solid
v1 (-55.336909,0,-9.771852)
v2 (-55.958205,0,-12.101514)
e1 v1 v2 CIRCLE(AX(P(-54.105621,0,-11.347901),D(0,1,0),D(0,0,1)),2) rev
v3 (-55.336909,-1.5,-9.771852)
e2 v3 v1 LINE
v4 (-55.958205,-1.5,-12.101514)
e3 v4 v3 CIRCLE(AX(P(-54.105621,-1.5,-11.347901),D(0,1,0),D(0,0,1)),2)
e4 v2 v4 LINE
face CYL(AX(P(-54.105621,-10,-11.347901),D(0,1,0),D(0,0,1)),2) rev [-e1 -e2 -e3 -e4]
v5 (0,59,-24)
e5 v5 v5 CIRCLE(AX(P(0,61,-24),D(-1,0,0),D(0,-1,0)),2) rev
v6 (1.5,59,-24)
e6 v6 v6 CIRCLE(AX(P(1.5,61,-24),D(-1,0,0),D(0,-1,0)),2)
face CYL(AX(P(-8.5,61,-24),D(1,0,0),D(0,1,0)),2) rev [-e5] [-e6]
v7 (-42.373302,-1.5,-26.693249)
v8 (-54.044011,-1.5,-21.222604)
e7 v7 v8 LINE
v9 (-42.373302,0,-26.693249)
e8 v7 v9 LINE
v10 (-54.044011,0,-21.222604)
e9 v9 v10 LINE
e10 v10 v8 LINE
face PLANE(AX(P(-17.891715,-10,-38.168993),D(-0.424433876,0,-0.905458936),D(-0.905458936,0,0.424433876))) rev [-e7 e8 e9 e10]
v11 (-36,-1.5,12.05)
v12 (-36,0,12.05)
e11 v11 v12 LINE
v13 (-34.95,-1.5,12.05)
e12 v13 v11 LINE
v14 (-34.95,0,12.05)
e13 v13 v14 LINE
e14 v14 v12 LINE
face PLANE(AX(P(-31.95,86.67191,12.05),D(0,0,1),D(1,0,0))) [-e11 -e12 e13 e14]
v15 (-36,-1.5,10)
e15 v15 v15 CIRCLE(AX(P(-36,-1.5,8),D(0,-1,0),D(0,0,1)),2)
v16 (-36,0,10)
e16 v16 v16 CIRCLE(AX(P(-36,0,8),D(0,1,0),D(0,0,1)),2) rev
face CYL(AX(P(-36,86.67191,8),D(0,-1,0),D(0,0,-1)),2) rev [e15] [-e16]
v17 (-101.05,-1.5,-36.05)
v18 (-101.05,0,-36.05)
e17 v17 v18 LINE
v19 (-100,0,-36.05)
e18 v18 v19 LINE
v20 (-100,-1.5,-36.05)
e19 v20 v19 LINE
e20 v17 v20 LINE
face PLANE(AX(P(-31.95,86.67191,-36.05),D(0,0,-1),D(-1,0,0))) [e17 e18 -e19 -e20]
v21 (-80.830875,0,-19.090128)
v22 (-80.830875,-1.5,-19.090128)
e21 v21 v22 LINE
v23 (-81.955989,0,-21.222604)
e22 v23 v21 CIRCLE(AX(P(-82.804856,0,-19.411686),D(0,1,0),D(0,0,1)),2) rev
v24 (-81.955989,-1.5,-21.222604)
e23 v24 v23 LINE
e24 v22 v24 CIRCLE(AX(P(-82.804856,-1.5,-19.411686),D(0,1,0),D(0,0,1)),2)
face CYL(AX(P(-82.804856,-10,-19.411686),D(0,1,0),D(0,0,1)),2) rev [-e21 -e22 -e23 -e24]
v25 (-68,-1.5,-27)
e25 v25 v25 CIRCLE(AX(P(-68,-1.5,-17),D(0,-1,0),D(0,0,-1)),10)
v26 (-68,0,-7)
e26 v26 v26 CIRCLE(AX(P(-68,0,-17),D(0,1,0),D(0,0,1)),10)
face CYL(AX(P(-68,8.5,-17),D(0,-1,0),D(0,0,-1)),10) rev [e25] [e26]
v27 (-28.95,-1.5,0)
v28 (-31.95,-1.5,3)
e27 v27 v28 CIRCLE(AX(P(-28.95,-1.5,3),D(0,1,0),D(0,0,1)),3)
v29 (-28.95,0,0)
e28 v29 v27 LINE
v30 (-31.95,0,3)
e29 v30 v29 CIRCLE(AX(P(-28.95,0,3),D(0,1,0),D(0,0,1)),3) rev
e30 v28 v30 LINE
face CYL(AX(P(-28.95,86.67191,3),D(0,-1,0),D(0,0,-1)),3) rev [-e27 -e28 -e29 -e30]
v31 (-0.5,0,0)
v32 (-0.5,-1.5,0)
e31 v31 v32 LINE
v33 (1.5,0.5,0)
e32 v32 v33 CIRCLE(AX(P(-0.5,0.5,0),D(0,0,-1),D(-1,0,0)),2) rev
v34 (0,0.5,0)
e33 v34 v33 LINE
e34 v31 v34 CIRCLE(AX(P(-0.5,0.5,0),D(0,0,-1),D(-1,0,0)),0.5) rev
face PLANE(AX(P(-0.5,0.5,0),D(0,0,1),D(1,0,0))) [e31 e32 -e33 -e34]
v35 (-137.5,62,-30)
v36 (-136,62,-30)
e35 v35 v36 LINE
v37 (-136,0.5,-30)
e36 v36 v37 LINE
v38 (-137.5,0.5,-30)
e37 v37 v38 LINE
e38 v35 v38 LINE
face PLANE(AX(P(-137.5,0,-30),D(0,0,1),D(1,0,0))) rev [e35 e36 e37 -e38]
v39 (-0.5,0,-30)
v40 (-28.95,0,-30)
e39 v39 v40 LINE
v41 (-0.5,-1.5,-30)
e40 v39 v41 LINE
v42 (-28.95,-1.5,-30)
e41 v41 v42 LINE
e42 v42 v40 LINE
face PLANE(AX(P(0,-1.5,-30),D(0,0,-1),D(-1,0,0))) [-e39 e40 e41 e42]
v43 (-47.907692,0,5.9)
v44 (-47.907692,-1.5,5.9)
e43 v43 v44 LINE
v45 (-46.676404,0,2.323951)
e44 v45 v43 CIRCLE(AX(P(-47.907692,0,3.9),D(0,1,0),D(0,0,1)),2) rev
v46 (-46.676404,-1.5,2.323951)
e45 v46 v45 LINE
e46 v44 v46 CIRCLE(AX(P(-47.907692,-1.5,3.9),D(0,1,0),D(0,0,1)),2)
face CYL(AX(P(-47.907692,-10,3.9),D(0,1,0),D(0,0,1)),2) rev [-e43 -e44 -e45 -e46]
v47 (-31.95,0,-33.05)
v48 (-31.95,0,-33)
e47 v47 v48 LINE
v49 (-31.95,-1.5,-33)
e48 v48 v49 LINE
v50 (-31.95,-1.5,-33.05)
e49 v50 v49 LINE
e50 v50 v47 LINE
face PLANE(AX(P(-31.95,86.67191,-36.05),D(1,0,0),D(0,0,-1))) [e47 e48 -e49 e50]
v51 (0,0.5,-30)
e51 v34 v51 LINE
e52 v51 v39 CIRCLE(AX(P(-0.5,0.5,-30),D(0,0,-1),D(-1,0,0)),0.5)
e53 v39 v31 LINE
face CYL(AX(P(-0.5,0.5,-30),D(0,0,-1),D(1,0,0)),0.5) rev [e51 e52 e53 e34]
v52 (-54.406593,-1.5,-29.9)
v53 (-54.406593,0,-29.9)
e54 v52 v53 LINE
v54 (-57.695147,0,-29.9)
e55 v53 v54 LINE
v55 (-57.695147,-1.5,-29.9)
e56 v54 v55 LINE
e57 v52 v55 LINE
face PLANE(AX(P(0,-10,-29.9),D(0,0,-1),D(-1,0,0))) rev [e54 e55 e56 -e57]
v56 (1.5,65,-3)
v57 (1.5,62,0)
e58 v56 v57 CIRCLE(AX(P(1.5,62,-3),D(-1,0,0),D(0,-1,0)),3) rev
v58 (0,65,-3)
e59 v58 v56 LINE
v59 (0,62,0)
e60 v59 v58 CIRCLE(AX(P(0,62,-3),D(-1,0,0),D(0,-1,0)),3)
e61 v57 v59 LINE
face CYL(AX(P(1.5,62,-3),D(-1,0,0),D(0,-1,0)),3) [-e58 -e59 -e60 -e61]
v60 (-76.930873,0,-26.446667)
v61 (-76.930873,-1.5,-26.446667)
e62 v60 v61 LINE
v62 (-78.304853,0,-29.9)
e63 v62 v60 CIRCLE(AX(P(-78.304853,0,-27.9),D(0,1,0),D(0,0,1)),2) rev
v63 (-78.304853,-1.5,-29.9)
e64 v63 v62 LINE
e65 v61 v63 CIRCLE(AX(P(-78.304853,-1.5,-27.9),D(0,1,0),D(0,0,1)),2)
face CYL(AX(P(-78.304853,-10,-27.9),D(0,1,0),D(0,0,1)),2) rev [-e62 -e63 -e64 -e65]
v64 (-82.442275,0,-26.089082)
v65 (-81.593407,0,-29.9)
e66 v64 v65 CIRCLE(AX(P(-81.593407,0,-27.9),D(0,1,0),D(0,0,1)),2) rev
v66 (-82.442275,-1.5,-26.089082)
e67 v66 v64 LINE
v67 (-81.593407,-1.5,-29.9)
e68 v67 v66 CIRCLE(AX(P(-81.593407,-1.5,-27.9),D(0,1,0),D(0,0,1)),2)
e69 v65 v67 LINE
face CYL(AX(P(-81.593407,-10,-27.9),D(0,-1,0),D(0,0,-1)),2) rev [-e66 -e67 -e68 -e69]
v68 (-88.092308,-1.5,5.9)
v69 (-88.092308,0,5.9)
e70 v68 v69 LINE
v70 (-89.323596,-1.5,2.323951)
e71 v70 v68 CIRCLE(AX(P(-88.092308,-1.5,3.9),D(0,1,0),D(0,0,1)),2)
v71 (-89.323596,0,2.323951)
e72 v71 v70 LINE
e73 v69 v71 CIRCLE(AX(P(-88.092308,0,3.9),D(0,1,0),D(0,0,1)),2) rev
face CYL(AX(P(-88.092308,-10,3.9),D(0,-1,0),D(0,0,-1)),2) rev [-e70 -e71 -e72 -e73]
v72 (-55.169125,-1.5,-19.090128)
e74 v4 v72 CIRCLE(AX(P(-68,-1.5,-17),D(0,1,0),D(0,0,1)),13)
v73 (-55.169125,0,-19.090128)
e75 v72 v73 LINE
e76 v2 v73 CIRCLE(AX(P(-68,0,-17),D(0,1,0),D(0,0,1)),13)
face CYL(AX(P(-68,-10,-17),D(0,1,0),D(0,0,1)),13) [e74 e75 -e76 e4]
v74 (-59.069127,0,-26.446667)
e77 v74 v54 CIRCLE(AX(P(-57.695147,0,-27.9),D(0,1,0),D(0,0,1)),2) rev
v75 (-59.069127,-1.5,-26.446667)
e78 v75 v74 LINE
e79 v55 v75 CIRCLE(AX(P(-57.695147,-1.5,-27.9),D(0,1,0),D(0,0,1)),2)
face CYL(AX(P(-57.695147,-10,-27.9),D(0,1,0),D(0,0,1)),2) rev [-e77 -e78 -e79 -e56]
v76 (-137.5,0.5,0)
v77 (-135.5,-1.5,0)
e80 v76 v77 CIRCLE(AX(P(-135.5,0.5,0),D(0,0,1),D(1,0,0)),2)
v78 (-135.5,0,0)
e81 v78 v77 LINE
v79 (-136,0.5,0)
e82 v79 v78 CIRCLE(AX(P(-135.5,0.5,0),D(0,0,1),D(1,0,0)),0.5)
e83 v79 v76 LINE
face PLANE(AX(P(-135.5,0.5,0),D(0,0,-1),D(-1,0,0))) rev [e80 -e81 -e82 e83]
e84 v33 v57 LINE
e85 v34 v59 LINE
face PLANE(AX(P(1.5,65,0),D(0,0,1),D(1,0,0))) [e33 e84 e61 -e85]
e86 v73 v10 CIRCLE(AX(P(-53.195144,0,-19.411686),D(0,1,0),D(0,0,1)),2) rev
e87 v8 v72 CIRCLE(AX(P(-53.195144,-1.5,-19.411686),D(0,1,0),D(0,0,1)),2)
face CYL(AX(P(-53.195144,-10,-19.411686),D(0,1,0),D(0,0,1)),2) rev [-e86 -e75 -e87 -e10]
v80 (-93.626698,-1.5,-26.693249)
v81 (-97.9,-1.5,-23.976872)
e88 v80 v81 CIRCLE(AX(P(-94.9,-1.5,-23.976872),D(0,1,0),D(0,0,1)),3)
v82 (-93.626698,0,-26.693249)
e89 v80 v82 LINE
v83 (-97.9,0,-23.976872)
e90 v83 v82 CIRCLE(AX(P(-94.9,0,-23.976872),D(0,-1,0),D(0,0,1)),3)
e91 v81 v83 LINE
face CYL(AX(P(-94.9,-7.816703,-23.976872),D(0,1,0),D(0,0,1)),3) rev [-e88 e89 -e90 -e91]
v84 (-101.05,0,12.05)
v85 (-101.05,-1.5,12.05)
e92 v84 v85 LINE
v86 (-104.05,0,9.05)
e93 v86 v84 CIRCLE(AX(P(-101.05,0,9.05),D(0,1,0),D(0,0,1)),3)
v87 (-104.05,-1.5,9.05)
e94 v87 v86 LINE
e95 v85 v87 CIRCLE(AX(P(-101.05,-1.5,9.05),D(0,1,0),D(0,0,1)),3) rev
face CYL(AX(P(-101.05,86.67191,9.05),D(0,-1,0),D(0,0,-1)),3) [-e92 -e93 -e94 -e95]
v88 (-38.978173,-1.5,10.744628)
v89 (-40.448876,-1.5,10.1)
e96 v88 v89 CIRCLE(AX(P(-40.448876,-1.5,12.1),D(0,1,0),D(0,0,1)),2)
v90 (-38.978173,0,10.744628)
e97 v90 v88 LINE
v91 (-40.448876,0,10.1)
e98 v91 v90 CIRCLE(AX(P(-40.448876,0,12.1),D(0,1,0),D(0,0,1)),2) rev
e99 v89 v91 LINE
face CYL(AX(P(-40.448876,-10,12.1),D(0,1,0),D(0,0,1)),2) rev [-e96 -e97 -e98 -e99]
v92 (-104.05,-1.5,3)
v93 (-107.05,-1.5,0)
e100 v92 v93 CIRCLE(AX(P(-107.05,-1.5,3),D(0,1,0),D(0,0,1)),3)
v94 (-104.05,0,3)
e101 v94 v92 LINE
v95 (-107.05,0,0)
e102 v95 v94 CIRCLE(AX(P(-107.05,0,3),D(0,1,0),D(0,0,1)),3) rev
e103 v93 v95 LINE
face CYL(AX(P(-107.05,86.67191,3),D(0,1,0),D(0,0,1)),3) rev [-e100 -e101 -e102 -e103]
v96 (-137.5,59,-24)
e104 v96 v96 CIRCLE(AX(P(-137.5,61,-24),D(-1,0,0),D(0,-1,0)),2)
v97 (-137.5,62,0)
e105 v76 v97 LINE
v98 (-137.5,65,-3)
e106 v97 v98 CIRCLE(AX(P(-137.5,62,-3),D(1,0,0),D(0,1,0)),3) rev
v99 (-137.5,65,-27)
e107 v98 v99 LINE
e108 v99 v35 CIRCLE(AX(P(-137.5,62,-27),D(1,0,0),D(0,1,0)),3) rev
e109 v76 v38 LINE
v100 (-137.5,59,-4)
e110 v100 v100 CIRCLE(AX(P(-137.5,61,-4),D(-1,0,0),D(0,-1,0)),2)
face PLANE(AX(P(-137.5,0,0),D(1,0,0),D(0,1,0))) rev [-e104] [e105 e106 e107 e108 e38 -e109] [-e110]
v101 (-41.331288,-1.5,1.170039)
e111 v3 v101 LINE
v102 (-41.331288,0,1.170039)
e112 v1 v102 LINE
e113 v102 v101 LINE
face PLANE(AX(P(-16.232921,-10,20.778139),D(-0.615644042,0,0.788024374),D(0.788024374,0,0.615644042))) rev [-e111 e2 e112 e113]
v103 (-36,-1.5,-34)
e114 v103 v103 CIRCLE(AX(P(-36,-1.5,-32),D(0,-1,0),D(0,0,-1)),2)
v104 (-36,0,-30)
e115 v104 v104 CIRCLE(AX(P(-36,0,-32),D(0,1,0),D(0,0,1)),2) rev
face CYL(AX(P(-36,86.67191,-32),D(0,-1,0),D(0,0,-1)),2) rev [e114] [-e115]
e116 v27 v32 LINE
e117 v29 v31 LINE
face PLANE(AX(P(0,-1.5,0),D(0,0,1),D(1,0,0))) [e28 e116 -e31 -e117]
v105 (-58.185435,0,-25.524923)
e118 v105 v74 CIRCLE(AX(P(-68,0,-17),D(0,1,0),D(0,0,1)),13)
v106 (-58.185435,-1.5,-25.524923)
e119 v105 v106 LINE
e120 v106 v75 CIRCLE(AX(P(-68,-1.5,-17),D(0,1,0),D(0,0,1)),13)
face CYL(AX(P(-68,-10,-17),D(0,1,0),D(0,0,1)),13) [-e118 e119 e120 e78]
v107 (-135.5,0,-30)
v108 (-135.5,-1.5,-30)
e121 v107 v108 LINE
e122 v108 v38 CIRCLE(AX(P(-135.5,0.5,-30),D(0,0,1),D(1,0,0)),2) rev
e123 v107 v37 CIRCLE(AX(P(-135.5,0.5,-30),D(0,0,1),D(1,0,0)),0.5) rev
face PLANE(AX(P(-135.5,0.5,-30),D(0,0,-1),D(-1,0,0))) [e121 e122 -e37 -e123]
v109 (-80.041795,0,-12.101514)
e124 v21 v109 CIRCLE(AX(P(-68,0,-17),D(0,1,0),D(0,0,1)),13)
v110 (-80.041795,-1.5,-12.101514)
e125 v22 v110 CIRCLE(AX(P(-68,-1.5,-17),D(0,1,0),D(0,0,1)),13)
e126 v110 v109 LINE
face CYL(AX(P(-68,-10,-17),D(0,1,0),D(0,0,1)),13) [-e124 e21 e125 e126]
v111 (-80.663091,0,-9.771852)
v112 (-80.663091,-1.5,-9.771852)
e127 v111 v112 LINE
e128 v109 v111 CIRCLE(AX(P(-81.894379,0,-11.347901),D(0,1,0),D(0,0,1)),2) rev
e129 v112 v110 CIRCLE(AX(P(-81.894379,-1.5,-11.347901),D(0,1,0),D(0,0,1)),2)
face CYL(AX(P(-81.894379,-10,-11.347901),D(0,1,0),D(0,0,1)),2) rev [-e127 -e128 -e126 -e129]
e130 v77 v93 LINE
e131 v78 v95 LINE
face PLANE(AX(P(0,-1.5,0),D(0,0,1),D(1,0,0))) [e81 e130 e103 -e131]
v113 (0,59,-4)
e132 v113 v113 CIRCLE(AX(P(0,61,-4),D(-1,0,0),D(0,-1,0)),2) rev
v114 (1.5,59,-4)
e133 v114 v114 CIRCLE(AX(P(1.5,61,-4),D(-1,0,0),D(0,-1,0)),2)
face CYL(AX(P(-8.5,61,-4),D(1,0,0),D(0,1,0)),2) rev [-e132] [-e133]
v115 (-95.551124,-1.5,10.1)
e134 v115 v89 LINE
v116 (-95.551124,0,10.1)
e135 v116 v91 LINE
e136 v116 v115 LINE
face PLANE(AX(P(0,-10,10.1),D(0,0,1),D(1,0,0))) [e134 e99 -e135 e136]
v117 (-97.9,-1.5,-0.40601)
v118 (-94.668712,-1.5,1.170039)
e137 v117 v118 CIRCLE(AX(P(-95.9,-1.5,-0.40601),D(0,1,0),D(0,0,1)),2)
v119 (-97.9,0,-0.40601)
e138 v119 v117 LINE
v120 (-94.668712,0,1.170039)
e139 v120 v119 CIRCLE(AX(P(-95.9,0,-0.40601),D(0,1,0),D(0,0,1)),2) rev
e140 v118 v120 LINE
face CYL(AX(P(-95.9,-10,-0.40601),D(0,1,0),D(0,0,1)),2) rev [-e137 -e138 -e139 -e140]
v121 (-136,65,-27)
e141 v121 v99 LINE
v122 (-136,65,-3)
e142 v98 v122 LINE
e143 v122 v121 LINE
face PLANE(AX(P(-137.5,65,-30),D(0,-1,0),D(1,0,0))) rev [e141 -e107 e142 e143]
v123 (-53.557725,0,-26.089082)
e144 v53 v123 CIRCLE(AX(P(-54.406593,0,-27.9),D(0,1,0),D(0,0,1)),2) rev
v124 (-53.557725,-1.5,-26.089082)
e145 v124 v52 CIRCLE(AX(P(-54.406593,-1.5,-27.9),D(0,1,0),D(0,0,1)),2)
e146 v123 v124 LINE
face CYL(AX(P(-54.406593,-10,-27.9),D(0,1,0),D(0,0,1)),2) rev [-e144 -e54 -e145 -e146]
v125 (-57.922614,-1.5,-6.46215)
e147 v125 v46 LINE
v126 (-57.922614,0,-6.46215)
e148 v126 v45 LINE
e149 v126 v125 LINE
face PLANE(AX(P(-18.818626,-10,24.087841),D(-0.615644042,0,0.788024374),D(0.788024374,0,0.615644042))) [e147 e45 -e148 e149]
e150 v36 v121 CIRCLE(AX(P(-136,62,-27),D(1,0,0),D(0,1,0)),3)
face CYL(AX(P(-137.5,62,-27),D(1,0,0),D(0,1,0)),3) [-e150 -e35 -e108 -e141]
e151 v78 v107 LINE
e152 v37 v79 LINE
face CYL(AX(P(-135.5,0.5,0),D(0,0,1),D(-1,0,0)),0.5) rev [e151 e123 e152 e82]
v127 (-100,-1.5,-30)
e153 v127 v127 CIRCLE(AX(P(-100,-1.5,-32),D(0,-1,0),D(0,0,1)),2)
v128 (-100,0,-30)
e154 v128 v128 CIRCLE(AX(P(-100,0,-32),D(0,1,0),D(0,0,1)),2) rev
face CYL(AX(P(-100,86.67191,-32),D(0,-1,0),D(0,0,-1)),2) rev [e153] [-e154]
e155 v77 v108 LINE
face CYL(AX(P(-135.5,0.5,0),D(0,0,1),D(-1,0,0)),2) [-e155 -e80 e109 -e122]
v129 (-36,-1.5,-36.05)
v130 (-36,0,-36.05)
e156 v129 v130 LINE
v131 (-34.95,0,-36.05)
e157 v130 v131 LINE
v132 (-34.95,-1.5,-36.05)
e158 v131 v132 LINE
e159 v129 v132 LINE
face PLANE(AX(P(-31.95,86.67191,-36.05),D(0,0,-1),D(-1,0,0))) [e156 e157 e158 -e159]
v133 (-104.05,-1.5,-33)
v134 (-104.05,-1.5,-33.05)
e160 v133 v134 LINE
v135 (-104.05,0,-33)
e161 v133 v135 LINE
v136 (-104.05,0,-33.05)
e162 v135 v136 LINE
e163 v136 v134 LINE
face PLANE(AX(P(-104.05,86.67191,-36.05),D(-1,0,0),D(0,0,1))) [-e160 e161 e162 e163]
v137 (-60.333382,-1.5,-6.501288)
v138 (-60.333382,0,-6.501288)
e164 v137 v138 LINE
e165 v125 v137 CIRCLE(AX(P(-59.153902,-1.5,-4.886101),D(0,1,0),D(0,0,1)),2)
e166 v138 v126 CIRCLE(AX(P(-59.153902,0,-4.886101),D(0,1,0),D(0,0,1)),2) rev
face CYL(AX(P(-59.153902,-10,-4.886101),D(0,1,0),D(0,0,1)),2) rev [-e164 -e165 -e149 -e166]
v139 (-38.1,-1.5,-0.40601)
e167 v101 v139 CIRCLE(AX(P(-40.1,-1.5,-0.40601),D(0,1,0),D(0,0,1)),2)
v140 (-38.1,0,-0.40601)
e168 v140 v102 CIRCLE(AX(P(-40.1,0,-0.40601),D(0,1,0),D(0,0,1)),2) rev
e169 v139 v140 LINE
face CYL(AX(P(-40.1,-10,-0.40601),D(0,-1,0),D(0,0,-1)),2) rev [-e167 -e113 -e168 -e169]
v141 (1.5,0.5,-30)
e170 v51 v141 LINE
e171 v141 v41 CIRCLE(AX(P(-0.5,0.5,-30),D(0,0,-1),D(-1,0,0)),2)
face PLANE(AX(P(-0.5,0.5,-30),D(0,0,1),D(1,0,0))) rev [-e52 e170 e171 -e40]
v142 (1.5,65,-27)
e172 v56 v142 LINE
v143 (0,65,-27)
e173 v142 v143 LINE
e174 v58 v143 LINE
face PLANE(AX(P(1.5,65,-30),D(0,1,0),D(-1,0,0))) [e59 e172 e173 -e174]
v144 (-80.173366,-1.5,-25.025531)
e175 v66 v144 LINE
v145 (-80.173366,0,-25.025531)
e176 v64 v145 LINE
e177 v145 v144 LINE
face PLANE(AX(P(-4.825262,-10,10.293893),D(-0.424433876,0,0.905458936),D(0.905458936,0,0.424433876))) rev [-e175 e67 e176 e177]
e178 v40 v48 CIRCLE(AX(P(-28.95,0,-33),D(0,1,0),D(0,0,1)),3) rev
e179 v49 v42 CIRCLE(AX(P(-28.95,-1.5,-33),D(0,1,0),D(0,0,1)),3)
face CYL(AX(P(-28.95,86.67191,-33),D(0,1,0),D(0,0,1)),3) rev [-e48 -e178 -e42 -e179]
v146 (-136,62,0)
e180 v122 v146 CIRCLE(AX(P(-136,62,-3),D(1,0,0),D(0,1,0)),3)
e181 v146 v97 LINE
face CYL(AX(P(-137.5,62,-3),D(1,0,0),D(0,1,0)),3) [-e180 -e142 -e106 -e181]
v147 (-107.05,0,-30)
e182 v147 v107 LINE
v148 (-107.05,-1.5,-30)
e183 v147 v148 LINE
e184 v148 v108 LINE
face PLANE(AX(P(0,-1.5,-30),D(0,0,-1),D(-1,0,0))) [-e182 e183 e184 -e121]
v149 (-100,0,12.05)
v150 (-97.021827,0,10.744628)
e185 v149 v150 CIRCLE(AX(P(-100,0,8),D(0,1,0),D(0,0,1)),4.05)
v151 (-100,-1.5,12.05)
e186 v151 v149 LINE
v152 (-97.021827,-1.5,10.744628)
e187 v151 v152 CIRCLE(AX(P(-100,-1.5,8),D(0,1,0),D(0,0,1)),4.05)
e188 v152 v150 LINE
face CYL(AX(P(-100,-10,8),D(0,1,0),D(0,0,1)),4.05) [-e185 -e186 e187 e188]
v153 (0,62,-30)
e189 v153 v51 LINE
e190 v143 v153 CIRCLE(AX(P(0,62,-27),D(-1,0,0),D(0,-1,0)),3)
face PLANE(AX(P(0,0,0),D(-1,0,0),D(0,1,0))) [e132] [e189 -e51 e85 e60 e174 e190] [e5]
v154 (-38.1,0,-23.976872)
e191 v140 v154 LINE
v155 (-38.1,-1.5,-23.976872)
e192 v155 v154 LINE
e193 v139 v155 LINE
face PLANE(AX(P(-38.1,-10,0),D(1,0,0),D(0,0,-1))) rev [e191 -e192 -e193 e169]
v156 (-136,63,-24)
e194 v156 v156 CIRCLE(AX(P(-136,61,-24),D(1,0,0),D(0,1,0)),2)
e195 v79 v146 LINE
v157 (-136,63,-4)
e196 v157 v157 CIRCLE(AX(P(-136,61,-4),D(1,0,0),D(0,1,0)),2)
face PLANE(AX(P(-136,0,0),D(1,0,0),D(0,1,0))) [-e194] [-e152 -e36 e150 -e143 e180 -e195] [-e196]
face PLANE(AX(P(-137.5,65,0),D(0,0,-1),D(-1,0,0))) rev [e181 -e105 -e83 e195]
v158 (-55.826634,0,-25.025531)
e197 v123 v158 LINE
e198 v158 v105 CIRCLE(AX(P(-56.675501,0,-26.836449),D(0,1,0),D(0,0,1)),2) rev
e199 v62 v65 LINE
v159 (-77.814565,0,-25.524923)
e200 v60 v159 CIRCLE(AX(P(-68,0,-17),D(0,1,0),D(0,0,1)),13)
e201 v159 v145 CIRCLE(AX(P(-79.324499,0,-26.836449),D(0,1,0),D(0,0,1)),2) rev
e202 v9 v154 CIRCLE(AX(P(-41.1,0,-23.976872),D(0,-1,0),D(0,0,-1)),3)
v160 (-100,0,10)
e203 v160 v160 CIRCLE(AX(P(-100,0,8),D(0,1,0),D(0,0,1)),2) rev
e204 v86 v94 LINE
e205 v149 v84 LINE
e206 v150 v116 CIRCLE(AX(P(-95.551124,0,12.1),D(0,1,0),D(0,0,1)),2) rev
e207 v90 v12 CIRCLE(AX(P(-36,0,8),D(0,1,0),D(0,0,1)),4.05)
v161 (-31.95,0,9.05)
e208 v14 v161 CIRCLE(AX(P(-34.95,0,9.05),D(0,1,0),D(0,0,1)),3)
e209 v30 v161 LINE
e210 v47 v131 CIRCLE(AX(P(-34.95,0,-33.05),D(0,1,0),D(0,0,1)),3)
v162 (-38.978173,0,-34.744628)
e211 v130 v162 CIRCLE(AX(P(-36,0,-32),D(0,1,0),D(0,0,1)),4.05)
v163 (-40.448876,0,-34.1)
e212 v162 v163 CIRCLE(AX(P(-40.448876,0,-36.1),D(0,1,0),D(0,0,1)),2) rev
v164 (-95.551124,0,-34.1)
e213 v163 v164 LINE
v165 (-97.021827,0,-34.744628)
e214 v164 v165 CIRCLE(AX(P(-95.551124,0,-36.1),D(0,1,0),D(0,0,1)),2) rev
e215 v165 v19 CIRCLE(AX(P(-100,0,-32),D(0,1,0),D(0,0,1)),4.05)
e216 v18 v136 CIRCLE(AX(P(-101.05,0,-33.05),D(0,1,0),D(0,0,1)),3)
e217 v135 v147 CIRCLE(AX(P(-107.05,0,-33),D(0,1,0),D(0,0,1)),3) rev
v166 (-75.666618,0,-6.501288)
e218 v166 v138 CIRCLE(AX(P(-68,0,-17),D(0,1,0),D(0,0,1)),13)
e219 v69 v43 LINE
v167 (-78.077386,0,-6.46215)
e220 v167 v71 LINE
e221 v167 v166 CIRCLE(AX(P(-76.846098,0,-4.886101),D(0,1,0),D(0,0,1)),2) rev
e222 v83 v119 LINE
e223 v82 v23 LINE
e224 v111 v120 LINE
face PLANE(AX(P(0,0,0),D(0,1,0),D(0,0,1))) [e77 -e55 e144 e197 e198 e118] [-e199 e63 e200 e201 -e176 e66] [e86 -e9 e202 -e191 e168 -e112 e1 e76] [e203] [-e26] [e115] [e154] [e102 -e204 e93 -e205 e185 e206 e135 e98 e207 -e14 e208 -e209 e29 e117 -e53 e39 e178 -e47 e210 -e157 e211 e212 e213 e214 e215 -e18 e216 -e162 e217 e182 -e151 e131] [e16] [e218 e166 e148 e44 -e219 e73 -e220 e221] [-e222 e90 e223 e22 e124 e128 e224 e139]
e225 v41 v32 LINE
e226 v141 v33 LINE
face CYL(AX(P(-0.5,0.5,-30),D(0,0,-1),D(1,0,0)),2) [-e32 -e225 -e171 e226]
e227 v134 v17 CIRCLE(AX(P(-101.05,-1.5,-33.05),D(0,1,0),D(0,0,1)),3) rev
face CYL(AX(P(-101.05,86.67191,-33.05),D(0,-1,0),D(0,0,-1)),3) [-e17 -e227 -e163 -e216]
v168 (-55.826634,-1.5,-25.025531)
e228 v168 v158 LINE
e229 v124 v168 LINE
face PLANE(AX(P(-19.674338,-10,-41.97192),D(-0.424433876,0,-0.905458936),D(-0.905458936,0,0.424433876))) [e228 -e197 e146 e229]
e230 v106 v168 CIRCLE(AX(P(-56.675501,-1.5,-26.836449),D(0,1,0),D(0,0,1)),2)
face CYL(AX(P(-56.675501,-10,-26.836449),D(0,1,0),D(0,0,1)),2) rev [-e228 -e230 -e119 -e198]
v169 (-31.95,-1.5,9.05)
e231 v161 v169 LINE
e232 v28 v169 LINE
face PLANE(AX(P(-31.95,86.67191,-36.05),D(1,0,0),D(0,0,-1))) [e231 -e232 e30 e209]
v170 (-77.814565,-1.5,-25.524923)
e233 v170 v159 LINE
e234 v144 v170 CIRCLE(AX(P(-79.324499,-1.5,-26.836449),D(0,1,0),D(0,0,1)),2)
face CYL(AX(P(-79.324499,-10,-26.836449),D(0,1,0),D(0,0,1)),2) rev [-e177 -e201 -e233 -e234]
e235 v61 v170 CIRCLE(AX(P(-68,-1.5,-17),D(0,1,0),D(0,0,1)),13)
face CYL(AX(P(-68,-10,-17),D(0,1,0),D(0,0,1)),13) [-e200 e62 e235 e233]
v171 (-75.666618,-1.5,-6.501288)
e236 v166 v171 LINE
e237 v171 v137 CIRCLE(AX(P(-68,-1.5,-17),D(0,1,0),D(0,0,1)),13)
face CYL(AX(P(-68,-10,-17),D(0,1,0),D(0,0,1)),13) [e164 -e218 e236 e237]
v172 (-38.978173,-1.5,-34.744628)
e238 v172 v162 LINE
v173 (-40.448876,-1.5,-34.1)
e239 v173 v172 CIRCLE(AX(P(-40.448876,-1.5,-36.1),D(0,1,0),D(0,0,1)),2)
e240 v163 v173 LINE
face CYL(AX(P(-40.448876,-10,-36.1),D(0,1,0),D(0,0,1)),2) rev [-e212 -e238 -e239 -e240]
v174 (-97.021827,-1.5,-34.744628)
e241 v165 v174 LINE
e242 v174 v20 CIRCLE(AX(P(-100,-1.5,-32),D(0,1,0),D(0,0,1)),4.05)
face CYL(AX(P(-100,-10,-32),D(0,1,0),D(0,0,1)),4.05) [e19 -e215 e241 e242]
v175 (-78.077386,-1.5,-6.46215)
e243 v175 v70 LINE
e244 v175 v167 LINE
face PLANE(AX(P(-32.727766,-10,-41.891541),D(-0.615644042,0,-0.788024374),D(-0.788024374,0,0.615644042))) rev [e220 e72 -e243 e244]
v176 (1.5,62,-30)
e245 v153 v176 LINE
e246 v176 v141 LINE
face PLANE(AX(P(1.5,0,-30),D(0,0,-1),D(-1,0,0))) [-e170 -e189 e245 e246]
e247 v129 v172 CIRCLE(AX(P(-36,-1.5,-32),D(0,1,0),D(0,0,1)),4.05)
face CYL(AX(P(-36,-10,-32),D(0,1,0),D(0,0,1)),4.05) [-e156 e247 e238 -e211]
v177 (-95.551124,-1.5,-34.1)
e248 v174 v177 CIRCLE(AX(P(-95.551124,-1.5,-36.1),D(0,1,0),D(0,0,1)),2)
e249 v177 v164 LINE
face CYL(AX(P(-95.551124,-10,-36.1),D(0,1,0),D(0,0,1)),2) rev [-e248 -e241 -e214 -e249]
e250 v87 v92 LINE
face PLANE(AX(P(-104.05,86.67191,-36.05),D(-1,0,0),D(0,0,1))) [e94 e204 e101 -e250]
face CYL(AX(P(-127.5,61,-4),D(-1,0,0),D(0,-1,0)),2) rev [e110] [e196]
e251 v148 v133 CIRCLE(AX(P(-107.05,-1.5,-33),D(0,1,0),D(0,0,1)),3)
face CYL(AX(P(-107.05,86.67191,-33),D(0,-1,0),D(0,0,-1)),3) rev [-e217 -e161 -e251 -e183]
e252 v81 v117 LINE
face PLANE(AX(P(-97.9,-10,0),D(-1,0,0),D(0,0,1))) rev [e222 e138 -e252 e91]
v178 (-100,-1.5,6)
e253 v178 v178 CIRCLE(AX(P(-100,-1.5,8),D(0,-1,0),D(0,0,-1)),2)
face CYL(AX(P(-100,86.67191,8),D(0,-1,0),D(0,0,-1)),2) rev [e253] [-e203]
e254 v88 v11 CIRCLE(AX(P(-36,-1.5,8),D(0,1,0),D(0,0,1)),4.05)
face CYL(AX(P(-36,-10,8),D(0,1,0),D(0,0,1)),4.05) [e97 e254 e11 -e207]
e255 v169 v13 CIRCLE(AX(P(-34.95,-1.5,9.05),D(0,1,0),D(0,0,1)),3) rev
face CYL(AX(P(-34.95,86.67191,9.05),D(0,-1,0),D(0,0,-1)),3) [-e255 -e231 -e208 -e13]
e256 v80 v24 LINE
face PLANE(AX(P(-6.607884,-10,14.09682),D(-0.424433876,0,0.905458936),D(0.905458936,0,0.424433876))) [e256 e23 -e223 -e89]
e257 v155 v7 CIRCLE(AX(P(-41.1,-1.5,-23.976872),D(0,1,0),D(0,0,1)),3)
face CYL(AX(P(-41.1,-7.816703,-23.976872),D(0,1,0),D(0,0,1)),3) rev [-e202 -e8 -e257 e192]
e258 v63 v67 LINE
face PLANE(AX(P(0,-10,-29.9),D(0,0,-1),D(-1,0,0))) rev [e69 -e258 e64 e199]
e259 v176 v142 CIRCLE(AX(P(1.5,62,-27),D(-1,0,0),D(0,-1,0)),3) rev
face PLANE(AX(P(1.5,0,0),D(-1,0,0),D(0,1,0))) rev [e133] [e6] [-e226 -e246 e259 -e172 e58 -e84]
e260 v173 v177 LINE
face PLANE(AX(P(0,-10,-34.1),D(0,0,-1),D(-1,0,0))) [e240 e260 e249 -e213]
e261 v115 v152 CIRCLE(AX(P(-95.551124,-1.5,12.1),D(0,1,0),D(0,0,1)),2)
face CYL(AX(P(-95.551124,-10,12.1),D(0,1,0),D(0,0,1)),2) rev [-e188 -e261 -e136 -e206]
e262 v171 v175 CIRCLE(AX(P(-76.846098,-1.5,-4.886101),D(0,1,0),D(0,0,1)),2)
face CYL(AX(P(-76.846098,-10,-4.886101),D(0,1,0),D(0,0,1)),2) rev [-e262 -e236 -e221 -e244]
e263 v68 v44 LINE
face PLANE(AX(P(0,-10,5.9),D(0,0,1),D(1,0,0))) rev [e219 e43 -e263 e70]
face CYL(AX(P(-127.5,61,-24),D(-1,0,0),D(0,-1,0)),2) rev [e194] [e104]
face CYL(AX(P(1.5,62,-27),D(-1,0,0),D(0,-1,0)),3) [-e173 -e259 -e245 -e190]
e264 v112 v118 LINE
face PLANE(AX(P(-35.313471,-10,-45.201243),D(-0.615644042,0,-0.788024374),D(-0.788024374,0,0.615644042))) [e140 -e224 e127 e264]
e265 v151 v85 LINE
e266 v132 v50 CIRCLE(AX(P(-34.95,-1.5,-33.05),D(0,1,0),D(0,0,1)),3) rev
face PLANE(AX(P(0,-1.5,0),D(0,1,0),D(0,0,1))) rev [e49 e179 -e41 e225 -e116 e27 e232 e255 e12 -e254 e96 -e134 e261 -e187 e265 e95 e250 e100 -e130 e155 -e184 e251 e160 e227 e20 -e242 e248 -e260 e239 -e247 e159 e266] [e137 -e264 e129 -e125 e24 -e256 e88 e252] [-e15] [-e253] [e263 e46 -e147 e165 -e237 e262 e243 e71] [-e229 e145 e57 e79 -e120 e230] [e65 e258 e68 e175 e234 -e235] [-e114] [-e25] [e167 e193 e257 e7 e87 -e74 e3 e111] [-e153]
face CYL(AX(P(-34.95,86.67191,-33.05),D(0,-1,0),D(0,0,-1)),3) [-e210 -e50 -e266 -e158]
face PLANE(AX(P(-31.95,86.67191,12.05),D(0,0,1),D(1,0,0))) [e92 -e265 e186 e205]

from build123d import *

# Parameters (mm, degrees)
SKETCH5_W                    = 136
SKETCH5_H                    = 30
BASE_FLANGE1_DEPTH           = 1.5
EDGE_FLANGE1_STRIP_W         = 7
EDGE_FLANGE1_STRIP_H         = 1.5
EDGE_FLANGE1_STRIP_CUT_DEPTH = 30
EDGE_FLANGE1_DEPTH           = 30
SKETCH13_R                   = 2
CUT_EXTRUDE1_DEPTH           = 10
SKETCH14_W                   = 72.1
SKETCH14_H                   = 48.1
SKETCH14_R                   = 2
BOSS_EXTRUDE1_DEPTH          = 1.5
SKETCH15_R                   = 10
CUT_EXTRUDE2_DEPTH           = 10
FILLET1_R                    = 3
CUT_EXTRUDE5_DEPTH           = 10
FILLET4_R                    = 2
BOSS_EXTRUDE2_DEPTH          = 1.5


# Sheet-metal steps are written as plain solids
with BuildPart() as part:
    # Sketch5 → Base-Flange1 (new body)
    with BuildSketch(Plane(origin=(0, 0, 0), x_dir=(1, 0, 0), z_dir=(0, 1, 0))):
        with Locations((-68, 15)):
            Rectangle(SKETCH5_W, SKETCH5_H)
    extrude(amount=-BASE_FLANGE1_DEPTH)

    # Edge-Flange1 strip (across the edge) → Edge-Flange1 strip cut (cut)
    with BuildSketch(Plane(origin=(-136, 0, -30), x_dir=(1, 0, 0), z_dir=(0, 0, 1))):
        with Locations((-3, -0.75)):
            Rectangle(EDGE_FLANGE1_STRIP_W, EDGE_FLANGE1_STRIP_H)
    edge_flange1_strip_cut = extrude(amount=EDGE_FLANGE1_STRIP_CUT_DEPTH, mode=Mode.SUBTRACT)

    # Edge-Flange1 section (across the edge) → Edge-Flange1 (add)
    with BuildSketch(Plane(origin=(-136, 0, -30), x_dir=(1, 0, 0), z_dir=(0, 0, 1))):
        with BuildLine():
            Line((-1.5, 0.5), (-1.5, 65))
            Line((-1.5, 65), (0, 65))
            Line((0, 65), (0, 0.5))
            ThreePointArc((0, 0.5), (0.146446609, 0.146446609), (0.5, 0))
            Line((0.5, 0), (0.5, -1.5))
            ThreePointArc((0.5, -1.5), (-0.914213562, -0.914213562), (-1.5, 0.5))
        make_face()
    edge_flange1 = extrude(amount=EDGE_FLANGE1_DEPTH)

    # Sketch13 → Cut-Extrude1 (cut)
    with BuildSketch(Plane.ZY.offset(137.5)):
        with Locations(Location((-24, 61, 0), (0, 0, 270))):
            Circle(SKETCH13_R)
        with Locations(Location((-4, 61, 0), (0, 0, 270))):
            Circle(SKETCH13_R)
    cut_extrude1 = extrude(amount=-CUT_EXTRUDE1_DEPTH, mode=Mode.SUBTRACT)

    # Mirror1: Edge-Flange1 strip cut, Edge-Flange1, Cut-Extrude1 across plane
    add(edge_flange1_strip_cut.mirror(Plane(origin=(-68, 0, 0), x_dir=(0, 0, 1), z_dir=(1, 0, 0))), mode=Mode.SUBTRACT)
    add(edge_flange1.mirror(Plane(origin=(-68, 0, 0), x_dir=(0, 0, 1), z_dir=(1, 0, 0))))
    add(cut_extrude1.mirror(Plane(origin=(-68, 0, 0), x_dir=(0, 0, 1), z_dir=(1, 0, 0))), mode=Mode.SUBTRACT)

    # Sketch14 → Boss-Extrude1 (add)
    with BuildSketch(Plane.XZ.offset(1.5)):
        with Locations((-68, -12)):
            Rectangle(SKETCH14_W, SKETCH14_H)
        with Locations(Location((-100, 8, 0), (0, 0, 270))):
            Circle(SKETCH14_R, mode=Mode.SUBTRACT)
        with Locations(Location((-100, -32, 0), (0, 0, 90))):
            Circle(SKETCH14_R, mode=Mode.SUBTRACT)
        with Locations(Location((-36, -32, 0), (0, 0, 270))):
            Circle(SKETCH14_R, mode=Mode.SUBTRACT)
        with Locations(Location((-36, 8, 0), (0, 0, 90))):
            Circle(SKETCH14_R, mode=Mode.SUBTRACT)
    extrude(amount=-BOSS_EXTRUDE1_DEPTH)

    # Sketch15 → Cut-Extrude2 (cut)
    with BuildSketch(Plane.XZ.offset(1.5)):
        with Locations(Location((-68, -17, 0), (0, 0, 270))):
            Circle(SKETCH15_R)
    extrude(amount=-CUT_EXTRUDE2_DEPTH, mode=Mode.SUBTRACT)

    # Fillet1
    fillet1_edges = [part.edges().sort_by_distance(p)[0] for p in [
        (-31.95, -0.75, 0),
        (-104.05, -0.75, 0),
        (-104.05, -0.75, -30),
        (-104.05, -0.75, -36.05),
        (-31.95, -0.75, -30),
        (-104.05, -0.75, 12.05),
        (-31.95, -0.75, 12.05),
        (-31.95, -0.75, -36.05),
        (-136.75, 65, -30),
        (-136.75, 65, 0),
        (0.75, 65, 0),
        (0.75, 65, -30),
    ]]
    fillet(fillet1_edges, radius=FILLET1_R)

    # Sketch16 → Cut-Extrude5 (cut)
    with BuildSketch(Plane(origin=(0, 0, 0), x_dir=(1, 0, 0), z_dir=(0, 1, 0))):
        with BuildLine():
            ThreePointArc((-97.755689719, 28.628713693), (-97.827360667, 28.582085676), (-97.9, 28.536981086))
            Line((-97.9, 28.536981086), (-97.9, -3.694482809))
            Line((-97.9, -3.694482809), (-79.402624763, 10.756591595))
            ThreePointArc((-79.402624763, 10.756591595), (-80.917918539, 15.541445711), (-80.507682349, 20.543710239))
            Line((-80.507682349, 20.543710239), (-97.755689719, 28.628713693))
        make_face()
        with BuildLine():
            Line((-69.609347694, 29.9), (-90.572232827, 29.9))
            Line((-90.572232827, 29.9), (-78.725060069, 24.34663777))
            ThreePointArc((-78.725060069, 24.34663777), (-74.763457823, 28.102055588), (-69.609347694, 29.9))
        make_face()
        with BuildLine():
            Line((-57.274939931, 24.34663777), (-45.427767173, 29.9))
            Line((-45.427767173, 29.9), (-66.390652306, 29.9))
            ThreePointArc((-66.390652306, 29.9), (-61.236542177, 28.102055588), (-57.274939931, 24.34663777))
        make_face()
        with BuildLine():
            Line((-36, 36.05), (-99.999999884, 36.05))
            ThreePointArc((-99.999999884, 36.05), (-98.012853754, 35.528987078), (-96.536981086, 34.1))
            Line((-96.536981086, 34.1), (-39.463018914, 34.1))
            ThreePointArc((-39.463018914, 34.1), (-37.987146195, 35.528987107), (-36, 36.05))
        make_face()
        with BuildLine():
            Line((-38.1, -3.694482809), (-38.1, 28.536981086))
            ThreePointArc((-38.1, 28.536981086), (-38.172639333, 28.582085676), (-38.244310281, 28.628713693))
            Line((-38.244310281, 28.628713693), (-55.492317651, 20.543710239))
            ThreePointArc((-55.492317651, 20.543710239), (-55.123667631, 18.788872475), (-55, 17))
            ThreePointArc((-55, 17), (-55.405673461, 13.777743176), (-56.597375237, 10.756591595))
            Line((-56.597375237, 10.756591595), (-38.1, -3.694482809))
        make_face()
        with BuildLine():
            ThreePointArc((-59.183080213, 7.446889225), (-68, 4), (-76.816919787, 7.446889225))
            Line((-76.816919787, 7.446889225), (-93.900937995, -5.9))
            Line((-93.900937995, -5.9), (-42.099062005, -5.9))
            Line((-42.099062005, -5.9), (-59.183080213, 7.446889225))
        make_face()
        with BuildLine():
            ThreePointArc((-96.536981086, -10.1), (-98.012853805, -11.528987107), (-100, -12.05))
            Line((-100, -12.05), (-36, -12.05))
            ThreePointArc((-36, -12.05), (-37.987146195, -11.528987107), (-39.463018914, -10.1))
            Line((-39.463018914, -10.1), (-96.536981086, -10.1))
        make_face()
    extrude(amount=-CUT_EXTRUDE5_DEPTH, mode=Mode.SUBTRACT)

    # Fillet4
    fillet4_edges = [part.edges().sort_by_distance(p)[0] for p in [
        (-56.597375237, -0.75, -10.756591595),
        (-55.492317651, -0.75, -20.543710239),
        (-38.1, -0.75, 3.694482809),
        (-39.463018914, -0.75, -34.1),
        (-96.536981086, -0.75, -34.1),
        (-57.274939931, -0.75, -24.34663777),
        (-66.390652306, -0.75, -29.9),
        (-45.427767173, -0.75, -29.9),
        (-69.609347694, -0.75, -29.9),
        (-78.725060069, -0.75, -24.34663777),
        (-90.572232827, -0.75, -29.9),
        (-76.816919787, -0.75, -7.446889225),
        (-59.183080213, -0.75, -7.446889225),
        (-42.099062005, -0.75, 5.9),
        (-93.900937995, -0.75, 5.9),
        (-96.536981086, -0.75, 10.1),
        (-39.463018914, -0.75, 10.1),
        (-80.507682349, -0.75, -20.543710239),
        (-79.402624763, -0.75, -10.756591595),
        (-97.9, -0.75, 3.694482809),
    ]]
    fillet(fillet4_edges, radius=FILLET4_R)

    # Sketch17 → Boss-Extrude2 (add)
    with BuildSketch(Plane(origin=(0, 0, 0), x_dir=(1, 0, 0), z_dir=(0, 1, 0))):
        with BuildLine():
            Line((-97.9, 28.536981086), (-97.9, 23.976872191))
            ThreePointArc((-97.9, 23.976872191), (-96.509362469, 26.50866058), (-93.626698371, 26.693248999))
            Line((-93.626698371, 26.693248999), (-97.755689719, 28.628713693))
            ThreePointArc((-97.755689719, 28.628713693), (-97.827360667, 28.582085676), (-97.9, 28.536981086))
        make_face()
        with BuildLine():
            Line((-38.244310281, 28.628713693), (-42.373301629, 26.693248999))
            ThreePointArc((-42.373301629, 26.693248999), (-39.490637531, 26.50866058), (-38.1, 23.976872191))
            Line((-38.1, 23.976872191), (-38.1, 28.536981086))
            ThreePointArc((-38.1, 28.536981086), (-38.172639333, 28.582085676), (-38.244310281, 28.628713693))
        make_face()
    extrude(amount=-BOSS_EXTRUDE2_DEPTH)


solid = part.part
